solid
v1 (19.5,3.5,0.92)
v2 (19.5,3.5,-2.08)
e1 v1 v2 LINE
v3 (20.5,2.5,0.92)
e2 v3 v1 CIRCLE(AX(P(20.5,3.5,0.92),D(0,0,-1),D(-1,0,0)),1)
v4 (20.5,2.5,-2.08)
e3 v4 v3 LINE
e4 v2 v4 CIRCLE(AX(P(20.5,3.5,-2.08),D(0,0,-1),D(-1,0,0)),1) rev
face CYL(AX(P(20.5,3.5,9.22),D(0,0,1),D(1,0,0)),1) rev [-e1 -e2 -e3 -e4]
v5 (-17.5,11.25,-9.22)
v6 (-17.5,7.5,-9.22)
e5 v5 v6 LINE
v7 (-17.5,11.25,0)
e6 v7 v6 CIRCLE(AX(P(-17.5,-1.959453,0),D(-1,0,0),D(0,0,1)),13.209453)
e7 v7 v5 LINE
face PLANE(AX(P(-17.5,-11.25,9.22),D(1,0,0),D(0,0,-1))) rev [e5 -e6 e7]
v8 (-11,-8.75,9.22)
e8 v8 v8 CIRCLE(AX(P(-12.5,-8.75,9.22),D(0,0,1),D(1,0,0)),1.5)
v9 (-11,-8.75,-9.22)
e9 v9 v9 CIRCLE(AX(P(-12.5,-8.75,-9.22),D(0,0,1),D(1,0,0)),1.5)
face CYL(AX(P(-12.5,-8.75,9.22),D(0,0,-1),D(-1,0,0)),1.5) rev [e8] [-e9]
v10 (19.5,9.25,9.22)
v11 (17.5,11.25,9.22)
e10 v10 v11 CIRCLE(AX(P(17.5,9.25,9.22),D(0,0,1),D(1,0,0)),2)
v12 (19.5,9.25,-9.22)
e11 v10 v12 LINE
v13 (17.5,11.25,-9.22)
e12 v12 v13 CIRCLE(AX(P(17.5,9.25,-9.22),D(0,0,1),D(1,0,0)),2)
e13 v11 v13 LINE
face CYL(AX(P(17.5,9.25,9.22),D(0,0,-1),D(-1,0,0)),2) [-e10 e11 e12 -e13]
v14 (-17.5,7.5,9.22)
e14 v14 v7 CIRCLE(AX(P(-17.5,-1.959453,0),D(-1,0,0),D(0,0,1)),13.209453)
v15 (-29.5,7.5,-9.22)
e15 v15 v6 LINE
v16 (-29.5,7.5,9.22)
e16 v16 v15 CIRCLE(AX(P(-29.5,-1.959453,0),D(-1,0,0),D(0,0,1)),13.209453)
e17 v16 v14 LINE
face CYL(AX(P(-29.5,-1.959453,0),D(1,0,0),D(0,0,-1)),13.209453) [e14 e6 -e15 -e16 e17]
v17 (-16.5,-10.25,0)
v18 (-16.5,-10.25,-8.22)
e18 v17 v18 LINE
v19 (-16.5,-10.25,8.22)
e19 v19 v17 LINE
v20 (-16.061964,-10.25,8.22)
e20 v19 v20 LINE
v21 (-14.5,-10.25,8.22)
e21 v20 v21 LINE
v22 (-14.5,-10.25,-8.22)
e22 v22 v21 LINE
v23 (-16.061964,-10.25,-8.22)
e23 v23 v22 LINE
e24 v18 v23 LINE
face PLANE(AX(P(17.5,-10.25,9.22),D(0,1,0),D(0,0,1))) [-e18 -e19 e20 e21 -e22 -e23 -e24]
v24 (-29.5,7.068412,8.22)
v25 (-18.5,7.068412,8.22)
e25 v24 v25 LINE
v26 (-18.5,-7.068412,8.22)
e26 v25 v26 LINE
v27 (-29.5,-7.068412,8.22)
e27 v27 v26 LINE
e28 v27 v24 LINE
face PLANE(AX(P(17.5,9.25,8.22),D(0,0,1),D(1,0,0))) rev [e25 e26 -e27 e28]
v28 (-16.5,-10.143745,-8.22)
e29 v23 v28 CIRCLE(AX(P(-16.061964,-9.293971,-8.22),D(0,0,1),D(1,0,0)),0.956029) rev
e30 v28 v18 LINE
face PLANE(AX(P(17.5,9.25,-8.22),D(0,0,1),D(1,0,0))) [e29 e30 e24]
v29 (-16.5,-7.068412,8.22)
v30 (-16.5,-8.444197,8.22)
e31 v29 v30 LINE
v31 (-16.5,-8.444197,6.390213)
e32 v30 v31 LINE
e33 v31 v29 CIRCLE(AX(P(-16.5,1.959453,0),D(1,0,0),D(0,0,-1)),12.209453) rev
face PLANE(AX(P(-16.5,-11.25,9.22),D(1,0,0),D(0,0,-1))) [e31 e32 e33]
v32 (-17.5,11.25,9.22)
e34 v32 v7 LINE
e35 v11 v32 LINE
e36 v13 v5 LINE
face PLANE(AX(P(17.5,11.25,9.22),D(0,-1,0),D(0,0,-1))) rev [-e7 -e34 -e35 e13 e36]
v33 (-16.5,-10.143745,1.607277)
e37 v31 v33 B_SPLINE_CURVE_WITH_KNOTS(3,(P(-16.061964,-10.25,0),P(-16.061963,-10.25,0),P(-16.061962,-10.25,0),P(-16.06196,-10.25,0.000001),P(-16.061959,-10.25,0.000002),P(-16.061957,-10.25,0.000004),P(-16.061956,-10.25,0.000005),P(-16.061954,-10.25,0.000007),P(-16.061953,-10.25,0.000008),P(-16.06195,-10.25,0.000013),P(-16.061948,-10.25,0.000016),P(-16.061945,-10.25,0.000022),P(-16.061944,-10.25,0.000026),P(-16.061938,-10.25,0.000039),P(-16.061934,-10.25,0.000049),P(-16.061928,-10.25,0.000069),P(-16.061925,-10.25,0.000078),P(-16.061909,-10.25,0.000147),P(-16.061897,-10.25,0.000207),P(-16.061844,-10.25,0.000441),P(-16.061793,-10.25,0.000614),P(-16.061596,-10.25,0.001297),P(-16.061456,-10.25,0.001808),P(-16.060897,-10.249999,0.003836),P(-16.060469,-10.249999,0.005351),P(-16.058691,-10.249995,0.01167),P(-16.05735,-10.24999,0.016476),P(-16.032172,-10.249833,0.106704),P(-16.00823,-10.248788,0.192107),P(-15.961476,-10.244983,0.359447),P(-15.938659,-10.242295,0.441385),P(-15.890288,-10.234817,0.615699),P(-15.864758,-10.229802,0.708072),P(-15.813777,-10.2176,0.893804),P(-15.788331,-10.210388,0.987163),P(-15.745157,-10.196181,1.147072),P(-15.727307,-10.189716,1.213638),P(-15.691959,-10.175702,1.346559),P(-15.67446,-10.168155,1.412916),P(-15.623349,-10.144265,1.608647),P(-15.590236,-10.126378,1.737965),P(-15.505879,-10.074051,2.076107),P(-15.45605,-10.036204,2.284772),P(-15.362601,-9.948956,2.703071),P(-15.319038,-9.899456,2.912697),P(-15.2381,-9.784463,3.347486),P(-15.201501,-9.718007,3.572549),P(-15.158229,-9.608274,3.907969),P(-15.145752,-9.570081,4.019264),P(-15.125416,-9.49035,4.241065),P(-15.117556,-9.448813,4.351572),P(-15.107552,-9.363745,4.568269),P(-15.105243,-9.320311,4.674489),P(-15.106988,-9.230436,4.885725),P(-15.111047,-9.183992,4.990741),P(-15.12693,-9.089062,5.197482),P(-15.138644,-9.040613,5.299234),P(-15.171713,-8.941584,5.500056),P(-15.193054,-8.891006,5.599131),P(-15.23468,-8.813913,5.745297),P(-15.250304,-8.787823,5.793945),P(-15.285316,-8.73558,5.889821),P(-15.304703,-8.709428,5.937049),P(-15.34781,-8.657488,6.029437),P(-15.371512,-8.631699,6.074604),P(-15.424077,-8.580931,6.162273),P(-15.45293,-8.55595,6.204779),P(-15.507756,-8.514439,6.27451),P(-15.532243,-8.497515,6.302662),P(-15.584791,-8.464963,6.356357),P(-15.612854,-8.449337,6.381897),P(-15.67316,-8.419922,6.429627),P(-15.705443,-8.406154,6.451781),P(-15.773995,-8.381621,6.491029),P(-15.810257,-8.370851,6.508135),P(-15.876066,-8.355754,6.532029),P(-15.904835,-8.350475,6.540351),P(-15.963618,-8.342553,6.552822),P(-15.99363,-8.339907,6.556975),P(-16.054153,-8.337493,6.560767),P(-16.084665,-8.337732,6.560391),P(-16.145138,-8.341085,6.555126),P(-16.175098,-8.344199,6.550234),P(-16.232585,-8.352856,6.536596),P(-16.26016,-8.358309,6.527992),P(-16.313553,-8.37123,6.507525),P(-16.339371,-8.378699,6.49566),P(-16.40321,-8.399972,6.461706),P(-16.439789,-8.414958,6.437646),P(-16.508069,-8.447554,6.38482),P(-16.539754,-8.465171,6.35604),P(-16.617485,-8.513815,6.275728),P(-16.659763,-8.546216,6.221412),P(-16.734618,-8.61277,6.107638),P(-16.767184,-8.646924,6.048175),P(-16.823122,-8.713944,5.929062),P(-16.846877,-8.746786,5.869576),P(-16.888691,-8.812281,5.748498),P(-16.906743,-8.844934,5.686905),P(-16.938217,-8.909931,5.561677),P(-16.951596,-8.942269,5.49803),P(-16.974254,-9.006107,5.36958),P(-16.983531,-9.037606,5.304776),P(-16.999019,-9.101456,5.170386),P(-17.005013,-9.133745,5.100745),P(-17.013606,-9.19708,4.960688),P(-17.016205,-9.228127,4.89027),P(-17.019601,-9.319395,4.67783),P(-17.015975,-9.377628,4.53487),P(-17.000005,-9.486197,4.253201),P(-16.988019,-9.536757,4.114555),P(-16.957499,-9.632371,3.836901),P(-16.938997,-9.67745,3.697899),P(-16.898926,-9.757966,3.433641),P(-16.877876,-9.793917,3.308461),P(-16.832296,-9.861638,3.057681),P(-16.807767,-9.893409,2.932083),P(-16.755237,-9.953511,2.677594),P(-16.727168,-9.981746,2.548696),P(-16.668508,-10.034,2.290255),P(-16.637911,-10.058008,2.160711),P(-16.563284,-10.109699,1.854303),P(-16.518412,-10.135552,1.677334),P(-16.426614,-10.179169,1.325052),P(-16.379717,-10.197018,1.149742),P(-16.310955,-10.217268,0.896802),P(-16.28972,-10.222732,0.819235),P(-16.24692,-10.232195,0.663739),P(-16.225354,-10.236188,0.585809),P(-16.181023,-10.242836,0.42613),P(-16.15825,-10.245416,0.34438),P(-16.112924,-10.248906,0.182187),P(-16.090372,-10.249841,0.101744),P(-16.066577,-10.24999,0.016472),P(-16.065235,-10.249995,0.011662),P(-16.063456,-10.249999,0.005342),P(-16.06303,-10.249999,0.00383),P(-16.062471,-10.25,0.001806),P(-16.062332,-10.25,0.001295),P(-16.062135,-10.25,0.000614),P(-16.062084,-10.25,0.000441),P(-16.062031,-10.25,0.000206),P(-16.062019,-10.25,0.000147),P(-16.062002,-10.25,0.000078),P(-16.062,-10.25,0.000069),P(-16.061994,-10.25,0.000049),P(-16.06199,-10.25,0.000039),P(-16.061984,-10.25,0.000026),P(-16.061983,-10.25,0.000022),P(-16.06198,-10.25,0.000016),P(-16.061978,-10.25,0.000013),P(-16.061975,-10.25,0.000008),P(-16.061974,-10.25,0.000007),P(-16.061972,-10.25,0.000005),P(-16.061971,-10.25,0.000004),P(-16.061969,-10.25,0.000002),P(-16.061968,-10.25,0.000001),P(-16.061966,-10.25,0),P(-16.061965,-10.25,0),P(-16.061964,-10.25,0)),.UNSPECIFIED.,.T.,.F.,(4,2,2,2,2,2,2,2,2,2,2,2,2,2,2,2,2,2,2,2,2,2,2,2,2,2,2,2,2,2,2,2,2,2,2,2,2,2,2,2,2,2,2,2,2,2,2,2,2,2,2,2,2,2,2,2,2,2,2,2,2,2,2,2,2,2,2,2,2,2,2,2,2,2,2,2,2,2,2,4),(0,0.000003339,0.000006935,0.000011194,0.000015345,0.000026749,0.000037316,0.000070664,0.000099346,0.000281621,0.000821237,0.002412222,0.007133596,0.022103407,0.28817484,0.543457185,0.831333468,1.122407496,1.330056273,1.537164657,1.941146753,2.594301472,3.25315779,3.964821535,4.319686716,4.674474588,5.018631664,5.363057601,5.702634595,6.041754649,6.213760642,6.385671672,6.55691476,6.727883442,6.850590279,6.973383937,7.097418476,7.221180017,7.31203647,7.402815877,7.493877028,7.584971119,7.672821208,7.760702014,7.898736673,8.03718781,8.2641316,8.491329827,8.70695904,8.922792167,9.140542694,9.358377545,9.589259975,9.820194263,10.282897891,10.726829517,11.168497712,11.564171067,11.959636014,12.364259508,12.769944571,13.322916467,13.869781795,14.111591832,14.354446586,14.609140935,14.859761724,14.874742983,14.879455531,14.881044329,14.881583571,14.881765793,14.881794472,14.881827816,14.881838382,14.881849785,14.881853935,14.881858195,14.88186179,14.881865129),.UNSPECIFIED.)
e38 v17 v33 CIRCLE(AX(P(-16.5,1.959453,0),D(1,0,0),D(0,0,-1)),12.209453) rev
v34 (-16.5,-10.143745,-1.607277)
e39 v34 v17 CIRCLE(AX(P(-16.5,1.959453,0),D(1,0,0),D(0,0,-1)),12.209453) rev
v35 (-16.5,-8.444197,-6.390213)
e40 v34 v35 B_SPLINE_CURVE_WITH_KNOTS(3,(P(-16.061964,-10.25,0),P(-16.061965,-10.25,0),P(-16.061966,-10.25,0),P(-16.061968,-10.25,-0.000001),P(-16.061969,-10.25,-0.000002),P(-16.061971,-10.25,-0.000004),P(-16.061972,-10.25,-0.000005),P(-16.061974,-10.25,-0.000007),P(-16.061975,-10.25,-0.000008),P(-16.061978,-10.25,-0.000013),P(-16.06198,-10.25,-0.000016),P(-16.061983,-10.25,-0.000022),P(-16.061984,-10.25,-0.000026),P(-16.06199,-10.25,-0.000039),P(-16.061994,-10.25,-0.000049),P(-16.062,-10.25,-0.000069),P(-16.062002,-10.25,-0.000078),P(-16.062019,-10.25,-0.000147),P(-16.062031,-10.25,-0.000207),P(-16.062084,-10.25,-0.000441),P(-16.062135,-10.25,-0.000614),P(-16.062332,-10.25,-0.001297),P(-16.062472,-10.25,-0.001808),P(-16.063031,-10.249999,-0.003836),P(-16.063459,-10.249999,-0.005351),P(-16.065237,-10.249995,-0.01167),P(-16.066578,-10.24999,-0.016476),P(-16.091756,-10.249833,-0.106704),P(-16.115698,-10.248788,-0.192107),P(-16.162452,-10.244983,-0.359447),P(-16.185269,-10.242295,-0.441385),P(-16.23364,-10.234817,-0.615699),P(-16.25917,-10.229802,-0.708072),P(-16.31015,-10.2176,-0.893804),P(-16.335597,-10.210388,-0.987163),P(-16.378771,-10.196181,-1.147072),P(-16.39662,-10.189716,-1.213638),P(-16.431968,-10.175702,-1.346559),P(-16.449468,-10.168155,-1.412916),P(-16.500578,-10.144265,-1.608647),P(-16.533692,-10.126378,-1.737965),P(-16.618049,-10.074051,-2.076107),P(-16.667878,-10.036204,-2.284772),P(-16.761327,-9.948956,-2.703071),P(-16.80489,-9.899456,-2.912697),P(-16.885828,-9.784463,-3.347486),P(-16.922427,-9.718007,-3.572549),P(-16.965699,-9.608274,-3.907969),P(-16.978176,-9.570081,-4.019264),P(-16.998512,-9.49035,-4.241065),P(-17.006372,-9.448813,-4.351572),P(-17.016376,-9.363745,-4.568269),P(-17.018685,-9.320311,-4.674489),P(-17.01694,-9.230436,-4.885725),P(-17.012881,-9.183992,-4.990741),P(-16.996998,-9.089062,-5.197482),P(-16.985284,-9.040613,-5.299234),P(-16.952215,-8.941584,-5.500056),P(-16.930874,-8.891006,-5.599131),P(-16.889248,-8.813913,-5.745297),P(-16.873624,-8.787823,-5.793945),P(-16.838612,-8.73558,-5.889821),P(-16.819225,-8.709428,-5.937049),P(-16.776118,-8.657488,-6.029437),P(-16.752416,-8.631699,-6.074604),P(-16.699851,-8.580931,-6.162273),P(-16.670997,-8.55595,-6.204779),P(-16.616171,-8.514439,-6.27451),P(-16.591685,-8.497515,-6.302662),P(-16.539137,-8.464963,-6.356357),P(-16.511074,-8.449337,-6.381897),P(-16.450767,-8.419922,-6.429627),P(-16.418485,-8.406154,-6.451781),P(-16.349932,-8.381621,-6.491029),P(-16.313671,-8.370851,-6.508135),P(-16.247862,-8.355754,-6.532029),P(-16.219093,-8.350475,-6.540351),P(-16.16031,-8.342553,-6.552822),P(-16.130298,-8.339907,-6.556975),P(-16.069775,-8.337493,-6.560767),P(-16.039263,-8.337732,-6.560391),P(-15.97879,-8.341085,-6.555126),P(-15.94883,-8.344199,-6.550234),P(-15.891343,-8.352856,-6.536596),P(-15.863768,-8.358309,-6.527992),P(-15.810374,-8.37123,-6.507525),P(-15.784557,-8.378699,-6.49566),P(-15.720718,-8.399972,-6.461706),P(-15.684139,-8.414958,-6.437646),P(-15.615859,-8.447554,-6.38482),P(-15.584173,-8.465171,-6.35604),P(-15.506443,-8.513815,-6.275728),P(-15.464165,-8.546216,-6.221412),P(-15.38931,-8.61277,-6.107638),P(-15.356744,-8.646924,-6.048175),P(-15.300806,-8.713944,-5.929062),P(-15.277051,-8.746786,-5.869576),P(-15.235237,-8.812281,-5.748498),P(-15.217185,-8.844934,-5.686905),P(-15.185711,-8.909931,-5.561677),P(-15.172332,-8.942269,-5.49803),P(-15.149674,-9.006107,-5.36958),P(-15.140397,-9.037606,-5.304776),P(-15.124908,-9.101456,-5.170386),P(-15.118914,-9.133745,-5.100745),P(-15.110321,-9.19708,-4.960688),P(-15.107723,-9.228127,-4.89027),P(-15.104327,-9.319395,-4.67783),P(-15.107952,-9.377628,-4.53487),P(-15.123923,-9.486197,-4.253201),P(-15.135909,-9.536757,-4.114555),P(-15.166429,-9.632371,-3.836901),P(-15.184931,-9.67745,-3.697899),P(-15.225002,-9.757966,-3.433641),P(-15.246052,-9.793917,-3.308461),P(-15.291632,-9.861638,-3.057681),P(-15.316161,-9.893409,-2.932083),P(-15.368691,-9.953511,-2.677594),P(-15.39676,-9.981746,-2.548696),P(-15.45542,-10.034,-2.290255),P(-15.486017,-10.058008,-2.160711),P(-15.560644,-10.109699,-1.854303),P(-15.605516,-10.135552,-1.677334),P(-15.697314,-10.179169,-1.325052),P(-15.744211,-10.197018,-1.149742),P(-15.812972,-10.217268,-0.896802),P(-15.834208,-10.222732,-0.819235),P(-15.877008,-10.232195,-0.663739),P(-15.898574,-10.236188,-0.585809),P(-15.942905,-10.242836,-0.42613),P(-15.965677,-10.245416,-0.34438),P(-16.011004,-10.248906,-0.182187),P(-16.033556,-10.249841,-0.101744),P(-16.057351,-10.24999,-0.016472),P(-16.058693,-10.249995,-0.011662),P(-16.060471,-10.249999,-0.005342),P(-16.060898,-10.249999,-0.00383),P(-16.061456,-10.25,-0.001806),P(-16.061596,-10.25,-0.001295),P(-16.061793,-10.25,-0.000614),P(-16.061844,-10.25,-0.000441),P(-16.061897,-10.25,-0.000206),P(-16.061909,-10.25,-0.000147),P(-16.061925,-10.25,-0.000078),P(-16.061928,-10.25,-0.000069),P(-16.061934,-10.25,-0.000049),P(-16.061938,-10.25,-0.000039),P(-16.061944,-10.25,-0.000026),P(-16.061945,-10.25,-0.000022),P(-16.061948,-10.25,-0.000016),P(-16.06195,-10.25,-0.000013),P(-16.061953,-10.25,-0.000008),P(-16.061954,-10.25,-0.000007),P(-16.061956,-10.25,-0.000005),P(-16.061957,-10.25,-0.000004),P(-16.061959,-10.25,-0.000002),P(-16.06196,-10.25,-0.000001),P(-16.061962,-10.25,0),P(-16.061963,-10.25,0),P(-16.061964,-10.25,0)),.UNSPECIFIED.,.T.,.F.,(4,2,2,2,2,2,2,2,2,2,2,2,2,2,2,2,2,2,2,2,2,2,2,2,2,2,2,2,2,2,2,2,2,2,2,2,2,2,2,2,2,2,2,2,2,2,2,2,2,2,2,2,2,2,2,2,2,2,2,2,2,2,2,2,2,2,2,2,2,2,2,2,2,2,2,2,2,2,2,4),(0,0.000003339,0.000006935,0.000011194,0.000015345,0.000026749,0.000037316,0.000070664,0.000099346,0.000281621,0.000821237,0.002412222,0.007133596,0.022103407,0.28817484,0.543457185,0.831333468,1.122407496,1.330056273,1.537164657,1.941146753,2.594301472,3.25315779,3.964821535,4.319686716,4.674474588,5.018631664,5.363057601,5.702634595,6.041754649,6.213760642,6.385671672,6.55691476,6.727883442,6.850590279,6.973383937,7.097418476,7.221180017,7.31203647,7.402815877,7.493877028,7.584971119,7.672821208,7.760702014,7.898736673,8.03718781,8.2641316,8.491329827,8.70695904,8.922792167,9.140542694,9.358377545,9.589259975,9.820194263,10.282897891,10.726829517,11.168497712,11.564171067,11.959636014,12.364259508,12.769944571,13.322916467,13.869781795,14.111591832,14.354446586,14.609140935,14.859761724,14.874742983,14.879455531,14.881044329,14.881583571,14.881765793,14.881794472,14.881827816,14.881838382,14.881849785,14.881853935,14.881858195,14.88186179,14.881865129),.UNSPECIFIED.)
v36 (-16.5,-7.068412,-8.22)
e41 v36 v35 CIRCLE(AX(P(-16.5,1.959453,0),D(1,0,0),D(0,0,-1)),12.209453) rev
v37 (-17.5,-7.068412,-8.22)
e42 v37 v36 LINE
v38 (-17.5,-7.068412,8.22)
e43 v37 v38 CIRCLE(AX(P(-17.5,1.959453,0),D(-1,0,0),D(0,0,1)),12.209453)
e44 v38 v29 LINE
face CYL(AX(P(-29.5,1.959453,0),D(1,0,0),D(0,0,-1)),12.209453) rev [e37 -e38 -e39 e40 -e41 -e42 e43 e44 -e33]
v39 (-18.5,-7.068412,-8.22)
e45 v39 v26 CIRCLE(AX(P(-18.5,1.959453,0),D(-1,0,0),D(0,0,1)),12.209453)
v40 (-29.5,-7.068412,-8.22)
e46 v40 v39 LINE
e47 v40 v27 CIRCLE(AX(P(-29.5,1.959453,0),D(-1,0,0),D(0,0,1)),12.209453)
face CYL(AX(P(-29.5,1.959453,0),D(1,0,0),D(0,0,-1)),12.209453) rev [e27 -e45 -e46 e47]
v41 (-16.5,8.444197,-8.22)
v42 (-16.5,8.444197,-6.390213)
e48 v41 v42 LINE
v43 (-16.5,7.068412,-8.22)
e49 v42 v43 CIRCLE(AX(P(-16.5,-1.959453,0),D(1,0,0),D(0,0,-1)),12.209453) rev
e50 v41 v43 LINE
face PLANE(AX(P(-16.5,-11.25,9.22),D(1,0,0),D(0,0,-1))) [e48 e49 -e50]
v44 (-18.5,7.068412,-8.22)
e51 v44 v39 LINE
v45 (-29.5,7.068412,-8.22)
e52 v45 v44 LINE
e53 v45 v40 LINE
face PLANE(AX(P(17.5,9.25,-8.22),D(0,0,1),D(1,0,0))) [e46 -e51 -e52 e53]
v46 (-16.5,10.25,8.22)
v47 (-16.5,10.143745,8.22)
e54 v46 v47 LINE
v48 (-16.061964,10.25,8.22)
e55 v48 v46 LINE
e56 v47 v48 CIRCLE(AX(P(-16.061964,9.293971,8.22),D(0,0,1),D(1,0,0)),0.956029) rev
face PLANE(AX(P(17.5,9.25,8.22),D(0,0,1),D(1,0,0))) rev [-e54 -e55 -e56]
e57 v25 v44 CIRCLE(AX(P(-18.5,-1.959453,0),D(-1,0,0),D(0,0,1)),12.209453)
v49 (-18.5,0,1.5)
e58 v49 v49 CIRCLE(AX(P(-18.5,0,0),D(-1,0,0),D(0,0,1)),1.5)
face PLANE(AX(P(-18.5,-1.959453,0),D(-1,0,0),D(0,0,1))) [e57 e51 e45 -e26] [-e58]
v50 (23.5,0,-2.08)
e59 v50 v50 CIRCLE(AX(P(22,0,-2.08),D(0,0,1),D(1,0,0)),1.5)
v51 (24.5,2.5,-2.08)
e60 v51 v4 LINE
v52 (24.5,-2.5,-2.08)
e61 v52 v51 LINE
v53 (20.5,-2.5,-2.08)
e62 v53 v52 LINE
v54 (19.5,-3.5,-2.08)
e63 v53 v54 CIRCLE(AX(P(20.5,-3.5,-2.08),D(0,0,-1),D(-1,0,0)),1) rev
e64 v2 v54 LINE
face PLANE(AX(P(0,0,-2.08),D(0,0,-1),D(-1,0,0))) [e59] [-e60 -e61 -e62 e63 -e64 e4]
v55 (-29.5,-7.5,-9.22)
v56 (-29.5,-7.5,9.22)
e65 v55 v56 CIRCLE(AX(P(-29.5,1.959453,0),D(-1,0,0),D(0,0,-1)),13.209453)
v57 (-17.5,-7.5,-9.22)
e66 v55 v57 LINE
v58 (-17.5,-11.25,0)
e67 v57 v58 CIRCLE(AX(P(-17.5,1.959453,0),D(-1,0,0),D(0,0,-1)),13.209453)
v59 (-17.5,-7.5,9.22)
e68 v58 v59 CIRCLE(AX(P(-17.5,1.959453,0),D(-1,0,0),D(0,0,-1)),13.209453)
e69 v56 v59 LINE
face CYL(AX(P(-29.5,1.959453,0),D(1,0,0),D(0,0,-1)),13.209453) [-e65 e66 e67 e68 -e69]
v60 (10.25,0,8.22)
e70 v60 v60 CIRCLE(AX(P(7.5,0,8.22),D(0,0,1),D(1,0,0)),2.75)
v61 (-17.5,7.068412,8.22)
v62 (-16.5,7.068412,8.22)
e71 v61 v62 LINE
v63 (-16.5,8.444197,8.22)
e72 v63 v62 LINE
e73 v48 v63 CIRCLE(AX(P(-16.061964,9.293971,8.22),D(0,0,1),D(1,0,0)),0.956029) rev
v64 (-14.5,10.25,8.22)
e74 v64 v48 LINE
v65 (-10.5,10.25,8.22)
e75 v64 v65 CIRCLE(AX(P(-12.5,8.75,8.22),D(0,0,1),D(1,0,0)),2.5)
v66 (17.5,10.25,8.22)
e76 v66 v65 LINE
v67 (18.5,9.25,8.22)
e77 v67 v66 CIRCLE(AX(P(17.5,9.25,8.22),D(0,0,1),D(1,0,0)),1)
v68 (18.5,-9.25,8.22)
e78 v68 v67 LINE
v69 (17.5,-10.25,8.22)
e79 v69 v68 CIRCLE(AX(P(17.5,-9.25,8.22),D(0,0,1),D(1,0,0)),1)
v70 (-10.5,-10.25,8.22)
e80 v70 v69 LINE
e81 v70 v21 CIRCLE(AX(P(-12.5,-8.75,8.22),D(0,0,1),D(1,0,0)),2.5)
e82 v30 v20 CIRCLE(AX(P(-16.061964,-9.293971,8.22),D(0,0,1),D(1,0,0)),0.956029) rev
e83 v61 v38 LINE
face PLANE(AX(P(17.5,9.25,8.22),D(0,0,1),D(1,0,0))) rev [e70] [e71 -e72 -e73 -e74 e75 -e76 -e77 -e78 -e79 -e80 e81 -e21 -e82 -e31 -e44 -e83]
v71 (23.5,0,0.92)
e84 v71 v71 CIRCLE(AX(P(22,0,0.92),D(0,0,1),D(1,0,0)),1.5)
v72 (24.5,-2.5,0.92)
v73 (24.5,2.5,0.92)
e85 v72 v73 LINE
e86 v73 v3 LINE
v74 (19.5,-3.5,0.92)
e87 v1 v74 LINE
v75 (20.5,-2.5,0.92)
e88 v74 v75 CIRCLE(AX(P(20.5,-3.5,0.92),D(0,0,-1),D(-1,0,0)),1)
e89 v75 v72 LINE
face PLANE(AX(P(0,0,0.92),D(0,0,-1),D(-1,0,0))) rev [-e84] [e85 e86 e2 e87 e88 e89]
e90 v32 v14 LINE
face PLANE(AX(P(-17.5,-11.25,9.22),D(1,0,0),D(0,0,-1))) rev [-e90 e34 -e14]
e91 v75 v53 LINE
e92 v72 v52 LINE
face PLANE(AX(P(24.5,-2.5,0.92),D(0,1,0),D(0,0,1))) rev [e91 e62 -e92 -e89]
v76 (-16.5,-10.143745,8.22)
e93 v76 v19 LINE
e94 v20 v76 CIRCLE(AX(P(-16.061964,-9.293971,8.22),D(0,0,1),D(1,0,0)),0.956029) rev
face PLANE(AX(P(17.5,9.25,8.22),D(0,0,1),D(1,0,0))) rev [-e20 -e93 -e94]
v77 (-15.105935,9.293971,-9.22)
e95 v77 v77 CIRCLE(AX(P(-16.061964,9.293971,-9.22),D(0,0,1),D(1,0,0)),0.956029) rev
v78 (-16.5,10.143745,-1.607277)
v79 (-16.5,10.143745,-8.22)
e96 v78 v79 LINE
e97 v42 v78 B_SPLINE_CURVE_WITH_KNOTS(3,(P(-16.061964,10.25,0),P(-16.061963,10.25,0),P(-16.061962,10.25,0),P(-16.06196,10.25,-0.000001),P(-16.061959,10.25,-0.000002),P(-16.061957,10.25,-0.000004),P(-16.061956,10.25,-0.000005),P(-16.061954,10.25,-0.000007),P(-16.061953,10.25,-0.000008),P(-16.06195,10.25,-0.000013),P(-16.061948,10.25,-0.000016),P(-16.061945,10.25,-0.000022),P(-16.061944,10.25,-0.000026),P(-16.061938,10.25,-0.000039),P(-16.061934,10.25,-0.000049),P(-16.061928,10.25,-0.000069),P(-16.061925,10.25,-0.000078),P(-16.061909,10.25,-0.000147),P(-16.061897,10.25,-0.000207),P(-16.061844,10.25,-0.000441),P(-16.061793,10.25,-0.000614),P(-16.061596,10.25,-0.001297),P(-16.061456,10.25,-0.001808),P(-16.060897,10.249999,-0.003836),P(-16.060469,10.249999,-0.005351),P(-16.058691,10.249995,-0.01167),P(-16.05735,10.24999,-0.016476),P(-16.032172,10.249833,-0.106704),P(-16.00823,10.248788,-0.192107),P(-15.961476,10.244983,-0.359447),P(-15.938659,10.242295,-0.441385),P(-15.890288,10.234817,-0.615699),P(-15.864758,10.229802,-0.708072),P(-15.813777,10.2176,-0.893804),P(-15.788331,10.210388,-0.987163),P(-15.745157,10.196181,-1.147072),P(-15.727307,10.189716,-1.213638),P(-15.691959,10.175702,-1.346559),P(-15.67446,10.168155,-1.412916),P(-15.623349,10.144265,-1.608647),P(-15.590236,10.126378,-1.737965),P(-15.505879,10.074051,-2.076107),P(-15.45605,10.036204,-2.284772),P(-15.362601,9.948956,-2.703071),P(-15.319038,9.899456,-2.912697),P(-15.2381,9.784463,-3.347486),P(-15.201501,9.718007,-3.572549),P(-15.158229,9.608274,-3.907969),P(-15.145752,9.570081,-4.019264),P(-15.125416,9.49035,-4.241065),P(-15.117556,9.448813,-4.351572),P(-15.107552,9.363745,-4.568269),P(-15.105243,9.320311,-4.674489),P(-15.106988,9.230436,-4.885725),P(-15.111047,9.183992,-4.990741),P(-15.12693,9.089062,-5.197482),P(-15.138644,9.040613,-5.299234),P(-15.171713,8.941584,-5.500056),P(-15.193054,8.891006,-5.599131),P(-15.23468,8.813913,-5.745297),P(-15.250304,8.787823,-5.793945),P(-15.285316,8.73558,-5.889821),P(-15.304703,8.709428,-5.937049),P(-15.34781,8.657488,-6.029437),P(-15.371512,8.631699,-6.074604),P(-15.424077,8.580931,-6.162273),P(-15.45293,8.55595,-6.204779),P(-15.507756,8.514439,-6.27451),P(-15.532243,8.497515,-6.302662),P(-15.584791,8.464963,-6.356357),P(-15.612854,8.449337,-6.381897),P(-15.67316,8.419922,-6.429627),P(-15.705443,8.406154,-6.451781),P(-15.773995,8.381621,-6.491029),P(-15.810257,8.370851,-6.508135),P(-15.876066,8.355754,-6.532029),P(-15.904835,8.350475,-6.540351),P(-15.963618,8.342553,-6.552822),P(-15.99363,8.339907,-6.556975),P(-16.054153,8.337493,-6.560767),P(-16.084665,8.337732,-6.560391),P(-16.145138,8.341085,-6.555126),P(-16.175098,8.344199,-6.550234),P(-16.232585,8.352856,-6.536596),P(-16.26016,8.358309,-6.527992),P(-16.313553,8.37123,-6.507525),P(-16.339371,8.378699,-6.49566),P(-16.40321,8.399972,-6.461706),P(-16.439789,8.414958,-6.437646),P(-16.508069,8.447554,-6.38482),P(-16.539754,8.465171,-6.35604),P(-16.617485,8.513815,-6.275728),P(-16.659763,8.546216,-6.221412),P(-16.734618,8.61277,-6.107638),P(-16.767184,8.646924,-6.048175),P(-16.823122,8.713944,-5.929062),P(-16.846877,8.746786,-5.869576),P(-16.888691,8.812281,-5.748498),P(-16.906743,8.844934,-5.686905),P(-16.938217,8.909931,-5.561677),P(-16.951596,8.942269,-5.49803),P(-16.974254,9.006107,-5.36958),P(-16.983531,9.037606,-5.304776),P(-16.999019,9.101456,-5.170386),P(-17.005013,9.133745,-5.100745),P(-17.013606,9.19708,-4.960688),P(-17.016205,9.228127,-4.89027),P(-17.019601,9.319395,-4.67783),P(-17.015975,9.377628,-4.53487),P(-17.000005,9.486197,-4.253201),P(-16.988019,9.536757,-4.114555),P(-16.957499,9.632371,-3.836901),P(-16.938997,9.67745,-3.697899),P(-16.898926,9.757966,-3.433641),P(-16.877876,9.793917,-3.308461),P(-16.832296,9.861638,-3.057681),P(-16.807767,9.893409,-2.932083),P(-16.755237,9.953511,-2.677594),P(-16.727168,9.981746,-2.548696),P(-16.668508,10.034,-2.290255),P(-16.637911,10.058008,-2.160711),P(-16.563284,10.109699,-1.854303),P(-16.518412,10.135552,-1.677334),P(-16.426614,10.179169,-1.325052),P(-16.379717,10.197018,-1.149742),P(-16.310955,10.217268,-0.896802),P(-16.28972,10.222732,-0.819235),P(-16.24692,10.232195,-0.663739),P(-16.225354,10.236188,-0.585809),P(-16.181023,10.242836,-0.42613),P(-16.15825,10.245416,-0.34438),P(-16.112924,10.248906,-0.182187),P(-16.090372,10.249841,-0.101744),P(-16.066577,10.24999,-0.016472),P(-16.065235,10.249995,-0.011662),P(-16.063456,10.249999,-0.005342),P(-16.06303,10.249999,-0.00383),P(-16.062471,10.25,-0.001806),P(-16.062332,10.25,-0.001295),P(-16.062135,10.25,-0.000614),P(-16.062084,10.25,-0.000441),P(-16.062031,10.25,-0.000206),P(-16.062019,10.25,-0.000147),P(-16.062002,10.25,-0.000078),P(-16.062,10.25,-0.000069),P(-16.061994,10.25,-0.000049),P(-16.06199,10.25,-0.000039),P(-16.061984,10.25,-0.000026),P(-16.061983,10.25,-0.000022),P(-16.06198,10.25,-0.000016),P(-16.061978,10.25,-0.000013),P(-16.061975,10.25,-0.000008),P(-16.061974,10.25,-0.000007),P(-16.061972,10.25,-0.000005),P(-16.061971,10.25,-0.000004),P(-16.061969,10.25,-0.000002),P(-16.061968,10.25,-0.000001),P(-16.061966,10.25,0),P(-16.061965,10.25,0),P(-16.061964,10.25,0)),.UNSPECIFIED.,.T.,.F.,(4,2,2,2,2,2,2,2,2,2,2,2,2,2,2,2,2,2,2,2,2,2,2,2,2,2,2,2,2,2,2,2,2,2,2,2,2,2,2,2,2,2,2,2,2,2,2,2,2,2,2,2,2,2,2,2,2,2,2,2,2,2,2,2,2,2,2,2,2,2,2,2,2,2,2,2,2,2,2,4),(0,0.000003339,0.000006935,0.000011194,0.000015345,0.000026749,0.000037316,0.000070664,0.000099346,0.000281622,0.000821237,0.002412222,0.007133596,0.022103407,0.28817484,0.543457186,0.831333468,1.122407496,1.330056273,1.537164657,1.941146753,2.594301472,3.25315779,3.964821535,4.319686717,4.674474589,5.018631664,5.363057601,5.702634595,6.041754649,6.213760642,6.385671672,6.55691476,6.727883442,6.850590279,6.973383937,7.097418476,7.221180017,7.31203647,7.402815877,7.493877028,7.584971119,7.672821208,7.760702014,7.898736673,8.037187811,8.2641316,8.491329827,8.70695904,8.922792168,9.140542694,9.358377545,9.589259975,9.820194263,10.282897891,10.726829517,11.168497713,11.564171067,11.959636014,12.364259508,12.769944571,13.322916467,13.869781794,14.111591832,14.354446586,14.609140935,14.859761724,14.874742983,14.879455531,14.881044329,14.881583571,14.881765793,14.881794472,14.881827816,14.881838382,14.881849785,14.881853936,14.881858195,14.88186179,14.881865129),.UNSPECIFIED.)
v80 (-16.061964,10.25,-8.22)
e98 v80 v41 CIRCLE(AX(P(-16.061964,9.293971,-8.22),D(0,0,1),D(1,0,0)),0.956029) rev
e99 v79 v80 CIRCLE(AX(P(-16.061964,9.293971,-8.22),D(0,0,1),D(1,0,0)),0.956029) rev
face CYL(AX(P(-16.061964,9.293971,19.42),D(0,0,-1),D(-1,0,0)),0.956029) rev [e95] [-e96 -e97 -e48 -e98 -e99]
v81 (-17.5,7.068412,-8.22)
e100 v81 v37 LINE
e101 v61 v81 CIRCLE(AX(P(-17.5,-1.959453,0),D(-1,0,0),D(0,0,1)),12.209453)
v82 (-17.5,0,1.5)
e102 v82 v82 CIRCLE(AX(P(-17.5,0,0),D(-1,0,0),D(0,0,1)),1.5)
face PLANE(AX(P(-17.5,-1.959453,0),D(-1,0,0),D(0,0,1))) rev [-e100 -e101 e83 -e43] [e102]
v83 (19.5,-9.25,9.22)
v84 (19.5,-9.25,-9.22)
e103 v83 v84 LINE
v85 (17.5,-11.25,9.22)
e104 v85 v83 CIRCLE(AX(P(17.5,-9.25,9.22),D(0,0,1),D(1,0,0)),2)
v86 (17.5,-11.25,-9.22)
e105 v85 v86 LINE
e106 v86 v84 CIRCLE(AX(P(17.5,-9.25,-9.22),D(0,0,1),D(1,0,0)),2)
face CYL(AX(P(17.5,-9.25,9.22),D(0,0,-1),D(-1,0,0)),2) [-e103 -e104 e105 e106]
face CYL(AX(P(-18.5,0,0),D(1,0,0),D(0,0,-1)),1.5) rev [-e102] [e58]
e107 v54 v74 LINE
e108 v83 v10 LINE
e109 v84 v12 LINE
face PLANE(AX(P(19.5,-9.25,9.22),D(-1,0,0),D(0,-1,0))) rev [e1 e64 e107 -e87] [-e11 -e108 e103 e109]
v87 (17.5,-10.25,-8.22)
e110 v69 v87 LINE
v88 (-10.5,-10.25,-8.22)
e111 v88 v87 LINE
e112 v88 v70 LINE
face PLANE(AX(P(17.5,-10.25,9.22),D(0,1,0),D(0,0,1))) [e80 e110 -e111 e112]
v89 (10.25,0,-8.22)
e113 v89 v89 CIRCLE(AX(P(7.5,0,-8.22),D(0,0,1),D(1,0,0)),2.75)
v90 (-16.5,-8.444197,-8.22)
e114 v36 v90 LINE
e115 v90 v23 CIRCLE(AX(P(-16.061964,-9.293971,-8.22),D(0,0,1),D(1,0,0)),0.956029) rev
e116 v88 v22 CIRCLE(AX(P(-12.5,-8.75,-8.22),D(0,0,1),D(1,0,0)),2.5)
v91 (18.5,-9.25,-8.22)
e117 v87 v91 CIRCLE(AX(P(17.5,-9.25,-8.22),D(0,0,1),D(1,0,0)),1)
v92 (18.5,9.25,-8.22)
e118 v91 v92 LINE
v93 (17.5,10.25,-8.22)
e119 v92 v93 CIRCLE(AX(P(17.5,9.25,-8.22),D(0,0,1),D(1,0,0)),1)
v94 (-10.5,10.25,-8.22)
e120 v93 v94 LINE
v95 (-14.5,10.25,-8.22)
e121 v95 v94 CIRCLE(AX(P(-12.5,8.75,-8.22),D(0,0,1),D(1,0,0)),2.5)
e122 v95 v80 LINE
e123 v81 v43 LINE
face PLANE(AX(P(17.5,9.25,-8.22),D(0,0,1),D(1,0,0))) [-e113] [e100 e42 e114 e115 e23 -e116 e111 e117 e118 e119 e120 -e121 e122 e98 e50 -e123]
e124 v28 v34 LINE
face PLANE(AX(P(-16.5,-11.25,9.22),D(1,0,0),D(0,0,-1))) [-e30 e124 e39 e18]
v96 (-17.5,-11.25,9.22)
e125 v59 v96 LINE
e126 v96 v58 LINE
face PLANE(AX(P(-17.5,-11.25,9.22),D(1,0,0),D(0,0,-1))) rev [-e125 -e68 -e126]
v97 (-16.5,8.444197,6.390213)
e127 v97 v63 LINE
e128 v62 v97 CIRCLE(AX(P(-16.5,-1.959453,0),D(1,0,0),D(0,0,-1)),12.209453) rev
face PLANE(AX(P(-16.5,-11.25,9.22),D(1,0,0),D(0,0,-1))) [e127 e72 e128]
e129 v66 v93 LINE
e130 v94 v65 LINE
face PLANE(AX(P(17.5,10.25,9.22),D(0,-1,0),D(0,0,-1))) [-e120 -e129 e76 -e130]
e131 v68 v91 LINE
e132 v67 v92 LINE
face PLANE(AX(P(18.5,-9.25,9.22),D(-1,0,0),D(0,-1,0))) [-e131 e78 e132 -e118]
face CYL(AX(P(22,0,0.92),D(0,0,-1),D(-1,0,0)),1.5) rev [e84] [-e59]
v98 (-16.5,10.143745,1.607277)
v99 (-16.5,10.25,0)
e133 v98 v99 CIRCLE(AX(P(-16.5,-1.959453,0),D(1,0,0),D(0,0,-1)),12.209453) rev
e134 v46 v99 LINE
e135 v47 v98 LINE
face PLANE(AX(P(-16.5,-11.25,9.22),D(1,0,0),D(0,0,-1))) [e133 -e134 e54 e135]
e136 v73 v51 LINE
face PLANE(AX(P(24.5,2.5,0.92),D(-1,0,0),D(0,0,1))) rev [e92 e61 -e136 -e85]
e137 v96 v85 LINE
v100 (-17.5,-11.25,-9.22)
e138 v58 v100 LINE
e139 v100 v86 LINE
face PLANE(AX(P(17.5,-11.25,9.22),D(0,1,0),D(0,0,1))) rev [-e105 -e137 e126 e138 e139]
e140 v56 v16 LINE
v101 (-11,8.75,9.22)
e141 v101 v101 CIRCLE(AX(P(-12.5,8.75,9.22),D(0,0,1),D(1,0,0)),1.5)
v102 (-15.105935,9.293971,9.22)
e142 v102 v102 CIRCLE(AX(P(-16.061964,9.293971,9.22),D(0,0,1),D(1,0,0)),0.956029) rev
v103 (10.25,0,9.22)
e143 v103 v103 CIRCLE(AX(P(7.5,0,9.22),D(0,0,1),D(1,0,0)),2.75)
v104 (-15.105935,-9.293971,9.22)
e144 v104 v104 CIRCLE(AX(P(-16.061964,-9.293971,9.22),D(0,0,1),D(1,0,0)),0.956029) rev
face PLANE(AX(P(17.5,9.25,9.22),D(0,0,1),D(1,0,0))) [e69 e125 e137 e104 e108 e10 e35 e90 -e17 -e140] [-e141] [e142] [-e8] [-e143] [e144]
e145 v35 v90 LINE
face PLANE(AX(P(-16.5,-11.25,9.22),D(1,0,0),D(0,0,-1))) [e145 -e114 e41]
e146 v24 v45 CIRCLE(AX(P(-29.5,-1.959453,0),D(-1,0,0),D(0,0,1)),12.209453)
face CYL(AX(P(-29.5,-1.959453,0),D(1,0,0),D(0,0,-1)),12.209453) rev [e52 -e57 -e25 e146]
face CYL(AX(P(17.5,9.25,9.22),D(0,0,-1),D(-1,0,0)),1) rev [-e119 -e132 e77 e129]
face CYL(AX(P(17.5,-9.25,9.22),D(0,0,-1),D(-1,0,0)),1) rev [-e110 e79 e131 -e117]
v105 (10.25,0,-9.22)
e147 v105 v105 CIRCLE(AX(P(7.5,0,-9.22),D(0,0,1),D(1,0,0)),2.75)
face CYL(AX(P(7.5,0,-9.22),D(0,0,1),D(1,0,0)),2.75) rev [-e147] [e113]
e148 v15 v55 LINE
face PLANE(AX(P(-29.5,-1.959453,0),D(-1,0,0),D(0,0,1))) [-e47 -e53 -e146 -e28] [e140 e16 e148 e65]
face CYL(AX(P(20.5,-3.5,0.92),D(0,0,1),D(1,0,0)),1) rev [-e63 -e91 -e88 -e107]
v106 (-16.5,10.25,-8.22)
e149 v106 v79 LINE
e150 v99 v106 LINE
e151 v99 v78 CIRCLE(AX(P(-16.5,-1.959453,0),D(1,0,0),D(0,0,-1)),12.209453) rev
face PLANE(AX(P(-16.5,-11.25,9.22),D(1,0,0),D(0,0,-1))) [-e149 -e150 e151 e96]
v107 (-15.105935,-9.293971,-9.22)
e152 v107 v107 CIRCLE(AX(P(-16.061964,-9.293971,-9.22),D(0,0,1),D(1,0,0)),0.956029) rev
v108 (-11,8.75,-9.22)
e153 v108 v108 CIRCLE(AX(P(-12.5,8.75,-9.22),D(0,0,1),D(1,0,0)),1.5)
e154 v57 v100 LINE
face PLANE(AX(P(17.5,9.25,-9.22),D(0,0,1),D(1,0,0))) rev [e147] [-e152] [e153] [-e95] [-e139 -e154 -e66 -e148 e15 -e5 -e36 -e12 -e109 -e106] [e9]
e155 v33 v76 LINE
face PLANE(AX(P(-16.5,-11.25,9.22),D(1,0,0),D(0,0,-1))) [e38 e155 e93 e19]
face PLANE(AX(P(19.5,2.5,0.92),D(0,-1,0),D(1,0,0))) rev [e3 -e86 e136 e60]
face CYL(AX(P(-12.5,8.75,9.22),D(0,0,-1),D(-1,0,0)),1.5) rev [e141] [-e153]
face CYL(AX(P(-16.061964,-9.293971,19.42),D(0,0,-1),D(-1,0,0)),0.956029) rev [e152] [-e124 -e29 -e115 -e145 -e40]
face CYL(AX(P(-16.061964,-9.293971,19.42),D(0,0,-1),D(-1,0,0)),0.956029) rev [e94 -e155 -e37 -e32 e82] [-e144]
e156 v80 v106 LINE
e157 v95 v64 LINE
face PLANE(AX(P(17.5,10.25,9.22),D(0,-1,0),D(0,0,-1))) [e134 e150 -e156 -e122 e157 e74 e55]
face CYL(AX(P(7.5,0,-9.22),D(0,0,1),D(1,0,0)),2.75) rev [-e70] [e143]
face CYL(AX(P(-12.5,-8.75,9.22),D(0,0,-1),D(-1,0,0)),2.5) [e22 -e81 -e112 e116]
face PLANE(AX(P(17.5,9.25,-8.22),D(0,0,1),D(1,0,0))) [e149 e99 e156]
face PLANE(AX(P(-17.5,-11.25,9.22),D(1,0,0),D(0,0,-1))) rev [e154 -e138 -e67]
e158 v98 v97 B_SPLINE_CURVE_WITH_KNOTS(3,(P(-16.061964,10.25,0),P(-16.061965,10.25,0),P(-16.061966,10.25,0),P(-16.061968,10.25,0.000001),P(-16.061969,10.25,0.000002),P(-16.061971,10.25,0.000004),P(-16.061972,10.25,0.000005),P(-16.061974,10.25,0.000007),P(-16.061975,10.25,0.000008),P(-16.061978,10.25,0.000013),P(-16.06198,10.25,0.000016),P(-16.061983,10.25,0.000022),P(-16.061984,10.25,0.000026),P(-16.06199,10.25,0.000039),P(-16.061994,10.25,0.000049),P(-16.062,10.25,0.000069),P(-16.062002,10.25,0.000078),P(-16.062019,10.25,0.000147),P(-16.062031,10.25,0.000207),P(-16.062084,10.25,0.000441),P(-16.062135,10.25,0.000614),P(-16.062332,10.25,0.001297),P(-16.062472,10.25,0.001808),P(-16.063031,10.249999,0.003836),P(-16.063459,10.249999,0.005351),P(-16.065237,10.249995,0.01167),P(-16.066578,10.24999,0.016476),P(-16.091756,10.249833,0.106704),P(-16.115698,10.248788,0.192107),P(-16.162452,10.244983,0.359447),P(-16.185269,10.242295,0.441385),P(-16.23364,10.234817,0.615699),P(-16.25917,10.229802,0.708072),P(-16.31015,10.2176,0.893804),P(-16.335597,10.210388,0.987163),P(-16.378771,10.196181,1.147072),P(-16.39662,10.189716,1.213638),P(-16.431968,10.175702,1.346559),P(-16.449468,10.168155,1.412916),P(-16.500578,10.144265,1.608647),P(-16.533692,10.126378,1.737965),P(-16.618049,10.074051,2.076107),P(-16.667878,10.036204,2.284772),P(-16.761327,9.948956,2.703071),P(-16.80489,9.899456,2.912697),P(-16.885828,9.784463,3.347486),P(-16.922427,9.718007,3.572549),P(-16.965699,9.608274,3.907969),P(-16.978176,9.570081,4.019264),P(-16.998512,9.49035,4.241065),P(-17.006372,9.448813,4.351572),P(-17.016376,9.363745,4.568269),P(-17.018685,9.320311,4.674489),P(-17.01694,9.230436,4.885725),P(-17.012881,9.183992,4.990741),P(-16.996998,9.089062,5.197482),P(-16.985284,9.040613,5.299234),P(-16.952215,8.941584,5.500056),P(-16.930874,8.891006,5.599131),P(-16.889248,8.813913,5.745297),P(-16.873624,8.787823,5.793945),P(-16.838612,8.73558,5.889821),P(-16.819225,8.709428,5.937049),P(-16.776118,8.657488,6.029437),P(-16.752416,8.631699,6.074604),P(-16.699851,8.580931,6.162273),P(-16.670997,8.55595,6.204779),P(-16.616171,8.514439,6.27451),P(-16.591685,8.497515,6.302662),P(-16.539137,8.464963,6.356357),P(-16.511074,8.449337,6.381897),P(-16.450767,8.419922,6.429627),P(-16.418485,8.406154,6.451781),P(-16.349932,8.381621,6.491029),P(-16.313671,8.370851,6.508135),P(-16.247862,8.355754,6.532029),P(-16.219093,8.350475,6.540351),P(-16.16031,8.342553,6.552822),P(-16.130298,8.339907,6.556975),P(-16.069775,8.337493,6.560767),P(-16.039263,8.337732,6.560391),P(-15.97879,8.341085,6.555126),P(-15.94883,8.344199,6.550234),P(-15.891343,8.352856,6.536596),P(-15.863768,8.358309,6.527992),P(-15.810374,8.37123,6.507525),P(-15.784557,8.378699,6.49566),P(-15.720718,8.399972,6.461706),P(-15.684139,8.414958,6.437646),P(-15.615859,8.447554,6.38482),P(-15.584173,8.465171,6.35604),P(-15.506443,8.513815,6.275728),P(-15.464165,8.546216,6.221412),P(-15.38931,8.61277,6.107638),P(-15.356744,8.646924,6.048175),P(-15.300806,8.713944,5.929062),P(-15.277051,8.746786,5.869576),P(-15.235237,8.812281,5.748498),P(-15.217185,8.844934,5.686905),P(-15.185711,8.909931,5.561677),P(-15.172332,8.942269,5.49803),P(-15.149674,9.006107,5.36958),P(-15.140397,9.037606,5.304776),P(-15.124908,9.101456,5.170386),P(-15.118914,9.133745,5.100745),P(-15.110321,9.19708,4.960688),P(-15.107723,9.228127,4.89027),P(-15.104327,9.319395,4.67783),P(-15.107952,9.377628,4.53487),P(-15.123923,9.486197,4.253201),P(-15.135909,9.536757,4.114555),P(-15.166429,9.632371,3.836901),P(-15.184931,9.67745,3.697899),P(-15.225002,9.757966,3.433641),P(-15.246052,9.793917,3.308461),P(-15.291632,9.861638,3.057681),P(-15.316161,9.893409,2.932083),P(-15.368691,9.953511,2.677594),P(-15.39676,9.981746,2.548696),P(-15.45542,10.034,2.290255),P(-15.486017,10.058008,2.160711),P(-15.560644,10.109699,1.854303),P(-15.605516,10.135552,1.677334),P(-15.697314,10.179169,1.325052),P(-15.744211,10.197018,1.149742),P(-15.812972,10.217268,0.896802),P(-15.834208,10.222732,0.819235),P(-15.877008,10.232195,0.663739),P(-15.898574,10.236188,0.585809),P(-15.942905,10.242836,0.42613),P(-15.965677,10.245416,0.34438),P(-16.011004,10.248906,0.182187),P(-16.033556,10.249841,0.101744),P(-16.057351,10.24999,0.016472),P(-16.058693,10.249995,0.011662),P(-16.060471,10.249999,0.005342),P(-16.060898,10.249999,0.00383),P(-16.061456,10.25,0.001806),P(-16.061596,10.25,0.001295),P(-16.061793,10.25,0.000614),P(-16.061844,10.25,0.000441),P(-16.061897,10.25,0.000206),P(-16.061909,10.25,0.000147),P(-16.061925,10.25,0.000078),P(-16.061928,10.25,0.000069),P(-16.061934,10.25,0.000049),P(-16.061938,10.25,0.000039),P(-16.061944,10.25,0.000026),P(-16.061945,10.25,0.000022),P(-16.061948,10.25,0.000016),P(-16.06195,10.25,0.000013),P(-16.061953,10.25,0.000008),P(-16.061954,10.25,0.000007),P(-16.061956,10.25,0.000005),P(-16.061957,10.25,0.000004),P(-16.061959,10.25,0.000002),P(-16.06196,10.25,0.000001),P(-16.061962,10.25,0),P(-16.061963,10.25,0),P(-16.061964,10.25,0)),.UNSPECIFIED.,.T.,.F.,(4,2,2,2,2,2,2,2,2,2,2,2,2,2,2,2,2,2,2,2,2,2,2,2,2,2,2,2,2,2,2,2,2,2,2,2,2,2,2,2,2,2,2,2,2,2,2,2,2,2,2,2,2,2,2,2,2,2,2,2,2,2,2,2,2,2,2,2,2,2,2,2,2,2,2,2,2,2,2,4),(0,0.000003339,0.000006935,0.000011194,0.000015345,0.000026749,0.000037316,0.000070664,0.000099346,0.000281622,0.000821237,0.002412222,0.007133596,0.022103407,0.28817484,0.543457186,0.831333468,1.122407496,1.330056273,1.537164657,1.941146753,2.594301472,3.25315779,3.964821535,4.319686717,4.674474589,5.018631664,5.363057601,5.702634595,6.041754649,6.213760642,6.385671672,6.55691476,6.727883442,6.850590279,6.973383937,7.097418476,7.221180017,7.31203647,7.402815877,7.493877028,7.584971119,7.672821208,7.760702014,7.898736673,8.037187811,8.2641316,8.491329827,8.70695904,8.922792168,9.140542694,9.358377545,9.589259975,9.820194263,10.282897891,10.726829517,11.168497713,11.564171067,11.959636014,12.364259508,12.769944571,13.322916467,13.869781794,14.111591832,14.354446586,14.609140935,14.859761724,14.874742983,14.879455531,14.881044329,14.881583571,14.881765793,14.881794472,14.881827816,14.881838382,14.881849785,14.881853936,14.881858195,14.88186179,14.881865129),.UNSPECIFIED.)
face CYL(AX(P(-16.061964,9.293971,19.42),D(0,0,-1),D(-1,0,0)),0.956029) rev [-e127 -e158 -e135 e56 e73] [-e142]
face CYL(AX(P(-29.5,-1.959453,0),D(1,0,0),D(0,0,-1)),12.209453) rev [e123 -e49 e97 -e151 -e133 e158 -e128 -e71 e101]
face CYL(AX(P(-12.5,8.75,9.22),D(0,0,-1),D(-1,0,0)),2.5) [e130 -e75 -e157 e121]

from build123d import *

# Parameters (mm, degrees)
SKETCH1_R                = 1.5
BOSS_EXTRUDE1_DEPTH      = 9.22
BOSS_EXTRUDE2_DEPTH      = 12
SHELL1_START             = -10
SHELL1_OUTLINE_W         = 20.5
SHELL1_OUTLINE_H         = 16.44
SHELL1_DEPTH             = 27.5
SHELL1_START_2           = -29.5
SHELL1_2_DEPTH           = 14.5
SHELL1_START_3           = -16.5
SHELL1_3_DEPTH           = 1.5
SHELL1_START_4           = -8.22
SHELL1_4_DEPTH           = 16.44
SKETCH3_R                = 1.5
BOSS_EXTRUDE3_DEPTH      = 1
BOSS_EXTRUDE4_DEPTH      = 1.5
BOSS_EXTRUDE4_DEPTH_BACK = 1.5
SKETCH6_W                = 5
SKETCH6_H                = 5
SKETCH6_R                = 1.5
SKETCH7_R                = 2.75
CUT_EXTRUDE1_DEPTH       = 37.562906066
FILLET1_R                = 1
CUT_EXTRUDE2_DEPTH       = 20
CUT_EXTRUDE2_DEPTH_BACK  = 20
SKETCH8_R                = 0.956029162


with BuildPart() as part:
    # Sketch1 → Boss-Extrude1 (new, symmetric)
    with BuildSketch(Plane.XY):
        with BuildLine():
            Line((17.5, -11.25), (-17.5, -11.25))
            Line((-17.5, -11.25), (-17.5, 11.25))
            Line((-17.5, 11.25), (17.5, 11.25))
            ThreePointArc((17.5, 11.25), (18.914213562, 10.664213562), (19.5, 9.25))
            Line((19.5, 9.25), (19.5, -9.25))
            ThreePointArc((19.5, -9.25), (18.914213562, -10.664213562), (17.5, -11.25))
        make_face()
        with Locations((-12.5, 8.75)):
            Circle(SKETCH1_R, mode=Mode.SUBTRACT)
        with Locations((-12.5, -8.75)):
            Circle(SKETCH1_R, mode=Mode.SUBTRACT)
    extrude(amount=BOSS_EXTRUDE1_DEPTH, both=True)

    # Sketch2 → Boss-Extrude2 (add)
    with BuildSketch(Plane.ZY.offset(17.5)):
        with BuildLine():
            Line((9.22, -7.5), (9.22, 7.5))
            ThreePointArc((9.22, 7.5), (0, 11.25), (-9.22, 7.5))
            Line((-9.22, 7.5), (-9.22, -7.5))
            ThreePointArc((-9.22, -7.5), (0, -11.25), (9.22, -7.5))
        make_face()
    extrude(amount=BOSS_EXTRUDE2_DEPTH)

    # Shell1: read off the stored shape, not the designer's step
    # Shell1 outline → Shell1 (cut)
    with BuildSketch(Plane.YZ.offset(SHELL1_START)):
        Rectangle(SHELL1_OUTLINE_W, SHELL1_OUTLINE_H)
    extrude(amount=SHELL1_DEPTH, mode=Mode.SUBTRACT)

    # Shell1 2 outline → Shell1 2 (cut)
    with BuildSketch(Plane.YZ.offset(SHELL1_START_2)):
        with BuildLine():
            ThreePointArc((7.068411902, -8.22), (10.25, 0), (7.068411902, 8.22))
            Line((7.068411902, 8.22), (-7.068411902, 8.22))
            ThreePointArc((-7.068411902, 8.22), (-10.25, 0), (-7.068411902, -8.22))
            Line((-7.068411902, -8.22), (7.068411902, -8.22))
        make_face()
    extrude(amount=SHELL1_2_DEPTH, mode=Mode.SUBTRACT)

    # Shell1 3 outline → Shell1 3 (cut)
    with BuildSketch(Plane.YZ.offset(SHELL1_START_3)):
        with BuildLine():
            Line((10.25, 0), (10.25, 8.22))
            Line((10.25, 8.22), (7.068411902, 8.22))
            ThreePointArc((7.068411902, 8.22), (9.426855331, 4.407122157), (10.25, 0))
        make_face()
        with BuildLine():
            Line((10.25, -8.22), (10.25, 0))
            ThreePointArc((10.25, 0), (9.426855331, -4.407122157), (7.068411902, -8.22))
            Line((7.068411902, -8.22), (10.25, -8.22))
        make_face()
        with BuildLine():
            ThreePointArc((-10.25, 0), (-9.426855331, 4.407122157), (-7.068411902, 8.22))
            Line((-7.068411902, 8.22), (-10.25, 8.22))
            Line((-10.25, 8.22), (-10.25, 0))
        make_face()
        with BuildLine():
            Line((-10.25, -8.22), (-7.068411902, -8.22))
            ThreePointArc((-7.068411902, -8.22), (-9.426855331, -4.407122157), (-10.25, 0))
            Line((-10.25, 0), (-10.25, -8.22))
        make_face()
    extrude(amount=SHELL1_3_DEPTH, mode=Mode.SUBTRACT)

    # Shell1 4 outline → Shell1 4 (cut)
    with BuildSketch(Plane.XY.offset(SHELL1_START_4)):
        with BuildLine():
            ThreePointArc((-14.5, -10.25), (-14.871708245, -9.540569415), (-15, -8.75))
            Line((-15, -8.75), (-15, -10.25))
            Line((-15, -10.25), (-14.5, -10.25))
        make_face()
        with BuildLine():
            ThreePointArc((-10, 8.75), (-12.499999993, 6.25), (-15, 8.749999987))
            Line((-15, 8.749999987), (-15, -8.75))
            ThreePointArc((-15, -8.75), (-12.5, -6.25), (-10, -8.75))
            Line((-10, -8.75), (-10, 8.75))
        make_face()
        with BuildLine():
            Line((-14.5, 10.25), (-15, 10.25))
            Line((-15, 10.25), (-15, 8.749999987))
            ThreePointArc((-15, 8.749999987), (-14.871708247, 9.540569409), (-14.5, 10.25))
        make_face()
        with BuildLine():
            ThreePointArc((-10.5, 10.25), (-10.128291755, 9.540569415), (-10, 8.75))
            Line((-10, 8.75), (-10, 10.25))
            Line((-10, 10.25), (-10.5, 10.25))
        make_face()
        with BuildLine():
            Line((-10, -10.25), (-10, -8.75))
            ThreePointArc((-10, -8.75), (-10.128291755, -9.540569415), (-10.5, -10.25))
            Line((-10.5, -10.25), (-10, -10.25))
        make_face()
        with BuildLine():
            ThreePointArc((18.5, 9.25), (18.207106781, 9.957106781), (17.5, 10.25))
            Line((17.5, 10.25), (17.5, -10.25))
            ThreePointArc((17.5, -10.25), (18.207106781, -9.957106781), (18.5, -9.25))
            Line((18.5, -9.25), (18.5, 9.25))
        make_face()
    extrude(amount=SHELL1_4_DEPTH, mode=Mode.SUBTRACT)

    # Sketch3 → Boss-Extrude3 (add)
    with BuildSketch(Plane.ZY.offset(17.5)):
        with BuildLine():
            Line((-9.22, 7.5), (-9.22, -7.5))
            ThreePointArc((-9.22, -7.5), (0, -11.25), (9.22, -7.5))
            Line((9.22, -7.5), (9.22, 7.5))
            ThreePointArc((9.22, 7.5), (0, 11.25), (-9.22, 7.5))
        make_face()
        Circle(SKETCH3_R, mode=Mode.SUBTRACT)
    extrude(amount=BOSS_EXTRUDE3_DEPTH)

    # Sketch6 → Boss-Extrude4 (add, two sides: drawn at the far end of the back side and taken through both)
    with BuildSketch(Plane.XY.offset(-0.58).offset(-BOSS_EXTRUDE4_DEPTH_BACK)):
        with Locations((22, 0)):
            Rectangle(SKETCH6_W, SKETCH6_H)
        with Locations((22, 0)):
            Circle(SKETCH6_R, mode=Mode.SUBTRACT)
    extrude(amount=BOSS_EXTRUDE4_DEPTH + BOSS_EXTRUDE4_DEPTH_BACK)

    # Sketch7 → Cut-Extrude1 (cut, through all)
    with BuildSketch(Plane.XY.offset(9.22)):
        with Locations((7.5, 0)):
            Circle(SKETCH7_R)
    extrude(amount=-CUT_EXTRUDE1_DEPTH, mode=Mode.SUBTRACT)

    # Fillet1
    fillet1_edges = [part.edges().sort_by_distance(p)[0] for p in [
        (19.5, 2.5, -0.58),
        (19.5, -2.5, -0.58),
    ]]
    fillet(fillet1_edges, radius=FILLET1_R)

    # Sketch8 → Cut-Extrude2 (cut, two sides: drawn at the far end of the back side and taken through both)
    with BuildSketch(Plane.XY.offset(-0.58).offset(-CUT_EXTRUDE2_DEPTH_BACK)):
        with Locations(Location((-16.061963922, 9.293970838, 0), (0, 0, 242.73008166))):
            Circle(SKETCH8_R)
        with Locations(Location((-16.061963922, -9.293970838, 0), (0, 0, 242.730056197))):
            Circle(SKETCH8_R)
    extrude(amount=CUT_EXTRUDE2_DEPTH + CUT_EXTRUDE2_DEPTH_BACK, mode=Mode.SUBTRACT)


solid = part.part
